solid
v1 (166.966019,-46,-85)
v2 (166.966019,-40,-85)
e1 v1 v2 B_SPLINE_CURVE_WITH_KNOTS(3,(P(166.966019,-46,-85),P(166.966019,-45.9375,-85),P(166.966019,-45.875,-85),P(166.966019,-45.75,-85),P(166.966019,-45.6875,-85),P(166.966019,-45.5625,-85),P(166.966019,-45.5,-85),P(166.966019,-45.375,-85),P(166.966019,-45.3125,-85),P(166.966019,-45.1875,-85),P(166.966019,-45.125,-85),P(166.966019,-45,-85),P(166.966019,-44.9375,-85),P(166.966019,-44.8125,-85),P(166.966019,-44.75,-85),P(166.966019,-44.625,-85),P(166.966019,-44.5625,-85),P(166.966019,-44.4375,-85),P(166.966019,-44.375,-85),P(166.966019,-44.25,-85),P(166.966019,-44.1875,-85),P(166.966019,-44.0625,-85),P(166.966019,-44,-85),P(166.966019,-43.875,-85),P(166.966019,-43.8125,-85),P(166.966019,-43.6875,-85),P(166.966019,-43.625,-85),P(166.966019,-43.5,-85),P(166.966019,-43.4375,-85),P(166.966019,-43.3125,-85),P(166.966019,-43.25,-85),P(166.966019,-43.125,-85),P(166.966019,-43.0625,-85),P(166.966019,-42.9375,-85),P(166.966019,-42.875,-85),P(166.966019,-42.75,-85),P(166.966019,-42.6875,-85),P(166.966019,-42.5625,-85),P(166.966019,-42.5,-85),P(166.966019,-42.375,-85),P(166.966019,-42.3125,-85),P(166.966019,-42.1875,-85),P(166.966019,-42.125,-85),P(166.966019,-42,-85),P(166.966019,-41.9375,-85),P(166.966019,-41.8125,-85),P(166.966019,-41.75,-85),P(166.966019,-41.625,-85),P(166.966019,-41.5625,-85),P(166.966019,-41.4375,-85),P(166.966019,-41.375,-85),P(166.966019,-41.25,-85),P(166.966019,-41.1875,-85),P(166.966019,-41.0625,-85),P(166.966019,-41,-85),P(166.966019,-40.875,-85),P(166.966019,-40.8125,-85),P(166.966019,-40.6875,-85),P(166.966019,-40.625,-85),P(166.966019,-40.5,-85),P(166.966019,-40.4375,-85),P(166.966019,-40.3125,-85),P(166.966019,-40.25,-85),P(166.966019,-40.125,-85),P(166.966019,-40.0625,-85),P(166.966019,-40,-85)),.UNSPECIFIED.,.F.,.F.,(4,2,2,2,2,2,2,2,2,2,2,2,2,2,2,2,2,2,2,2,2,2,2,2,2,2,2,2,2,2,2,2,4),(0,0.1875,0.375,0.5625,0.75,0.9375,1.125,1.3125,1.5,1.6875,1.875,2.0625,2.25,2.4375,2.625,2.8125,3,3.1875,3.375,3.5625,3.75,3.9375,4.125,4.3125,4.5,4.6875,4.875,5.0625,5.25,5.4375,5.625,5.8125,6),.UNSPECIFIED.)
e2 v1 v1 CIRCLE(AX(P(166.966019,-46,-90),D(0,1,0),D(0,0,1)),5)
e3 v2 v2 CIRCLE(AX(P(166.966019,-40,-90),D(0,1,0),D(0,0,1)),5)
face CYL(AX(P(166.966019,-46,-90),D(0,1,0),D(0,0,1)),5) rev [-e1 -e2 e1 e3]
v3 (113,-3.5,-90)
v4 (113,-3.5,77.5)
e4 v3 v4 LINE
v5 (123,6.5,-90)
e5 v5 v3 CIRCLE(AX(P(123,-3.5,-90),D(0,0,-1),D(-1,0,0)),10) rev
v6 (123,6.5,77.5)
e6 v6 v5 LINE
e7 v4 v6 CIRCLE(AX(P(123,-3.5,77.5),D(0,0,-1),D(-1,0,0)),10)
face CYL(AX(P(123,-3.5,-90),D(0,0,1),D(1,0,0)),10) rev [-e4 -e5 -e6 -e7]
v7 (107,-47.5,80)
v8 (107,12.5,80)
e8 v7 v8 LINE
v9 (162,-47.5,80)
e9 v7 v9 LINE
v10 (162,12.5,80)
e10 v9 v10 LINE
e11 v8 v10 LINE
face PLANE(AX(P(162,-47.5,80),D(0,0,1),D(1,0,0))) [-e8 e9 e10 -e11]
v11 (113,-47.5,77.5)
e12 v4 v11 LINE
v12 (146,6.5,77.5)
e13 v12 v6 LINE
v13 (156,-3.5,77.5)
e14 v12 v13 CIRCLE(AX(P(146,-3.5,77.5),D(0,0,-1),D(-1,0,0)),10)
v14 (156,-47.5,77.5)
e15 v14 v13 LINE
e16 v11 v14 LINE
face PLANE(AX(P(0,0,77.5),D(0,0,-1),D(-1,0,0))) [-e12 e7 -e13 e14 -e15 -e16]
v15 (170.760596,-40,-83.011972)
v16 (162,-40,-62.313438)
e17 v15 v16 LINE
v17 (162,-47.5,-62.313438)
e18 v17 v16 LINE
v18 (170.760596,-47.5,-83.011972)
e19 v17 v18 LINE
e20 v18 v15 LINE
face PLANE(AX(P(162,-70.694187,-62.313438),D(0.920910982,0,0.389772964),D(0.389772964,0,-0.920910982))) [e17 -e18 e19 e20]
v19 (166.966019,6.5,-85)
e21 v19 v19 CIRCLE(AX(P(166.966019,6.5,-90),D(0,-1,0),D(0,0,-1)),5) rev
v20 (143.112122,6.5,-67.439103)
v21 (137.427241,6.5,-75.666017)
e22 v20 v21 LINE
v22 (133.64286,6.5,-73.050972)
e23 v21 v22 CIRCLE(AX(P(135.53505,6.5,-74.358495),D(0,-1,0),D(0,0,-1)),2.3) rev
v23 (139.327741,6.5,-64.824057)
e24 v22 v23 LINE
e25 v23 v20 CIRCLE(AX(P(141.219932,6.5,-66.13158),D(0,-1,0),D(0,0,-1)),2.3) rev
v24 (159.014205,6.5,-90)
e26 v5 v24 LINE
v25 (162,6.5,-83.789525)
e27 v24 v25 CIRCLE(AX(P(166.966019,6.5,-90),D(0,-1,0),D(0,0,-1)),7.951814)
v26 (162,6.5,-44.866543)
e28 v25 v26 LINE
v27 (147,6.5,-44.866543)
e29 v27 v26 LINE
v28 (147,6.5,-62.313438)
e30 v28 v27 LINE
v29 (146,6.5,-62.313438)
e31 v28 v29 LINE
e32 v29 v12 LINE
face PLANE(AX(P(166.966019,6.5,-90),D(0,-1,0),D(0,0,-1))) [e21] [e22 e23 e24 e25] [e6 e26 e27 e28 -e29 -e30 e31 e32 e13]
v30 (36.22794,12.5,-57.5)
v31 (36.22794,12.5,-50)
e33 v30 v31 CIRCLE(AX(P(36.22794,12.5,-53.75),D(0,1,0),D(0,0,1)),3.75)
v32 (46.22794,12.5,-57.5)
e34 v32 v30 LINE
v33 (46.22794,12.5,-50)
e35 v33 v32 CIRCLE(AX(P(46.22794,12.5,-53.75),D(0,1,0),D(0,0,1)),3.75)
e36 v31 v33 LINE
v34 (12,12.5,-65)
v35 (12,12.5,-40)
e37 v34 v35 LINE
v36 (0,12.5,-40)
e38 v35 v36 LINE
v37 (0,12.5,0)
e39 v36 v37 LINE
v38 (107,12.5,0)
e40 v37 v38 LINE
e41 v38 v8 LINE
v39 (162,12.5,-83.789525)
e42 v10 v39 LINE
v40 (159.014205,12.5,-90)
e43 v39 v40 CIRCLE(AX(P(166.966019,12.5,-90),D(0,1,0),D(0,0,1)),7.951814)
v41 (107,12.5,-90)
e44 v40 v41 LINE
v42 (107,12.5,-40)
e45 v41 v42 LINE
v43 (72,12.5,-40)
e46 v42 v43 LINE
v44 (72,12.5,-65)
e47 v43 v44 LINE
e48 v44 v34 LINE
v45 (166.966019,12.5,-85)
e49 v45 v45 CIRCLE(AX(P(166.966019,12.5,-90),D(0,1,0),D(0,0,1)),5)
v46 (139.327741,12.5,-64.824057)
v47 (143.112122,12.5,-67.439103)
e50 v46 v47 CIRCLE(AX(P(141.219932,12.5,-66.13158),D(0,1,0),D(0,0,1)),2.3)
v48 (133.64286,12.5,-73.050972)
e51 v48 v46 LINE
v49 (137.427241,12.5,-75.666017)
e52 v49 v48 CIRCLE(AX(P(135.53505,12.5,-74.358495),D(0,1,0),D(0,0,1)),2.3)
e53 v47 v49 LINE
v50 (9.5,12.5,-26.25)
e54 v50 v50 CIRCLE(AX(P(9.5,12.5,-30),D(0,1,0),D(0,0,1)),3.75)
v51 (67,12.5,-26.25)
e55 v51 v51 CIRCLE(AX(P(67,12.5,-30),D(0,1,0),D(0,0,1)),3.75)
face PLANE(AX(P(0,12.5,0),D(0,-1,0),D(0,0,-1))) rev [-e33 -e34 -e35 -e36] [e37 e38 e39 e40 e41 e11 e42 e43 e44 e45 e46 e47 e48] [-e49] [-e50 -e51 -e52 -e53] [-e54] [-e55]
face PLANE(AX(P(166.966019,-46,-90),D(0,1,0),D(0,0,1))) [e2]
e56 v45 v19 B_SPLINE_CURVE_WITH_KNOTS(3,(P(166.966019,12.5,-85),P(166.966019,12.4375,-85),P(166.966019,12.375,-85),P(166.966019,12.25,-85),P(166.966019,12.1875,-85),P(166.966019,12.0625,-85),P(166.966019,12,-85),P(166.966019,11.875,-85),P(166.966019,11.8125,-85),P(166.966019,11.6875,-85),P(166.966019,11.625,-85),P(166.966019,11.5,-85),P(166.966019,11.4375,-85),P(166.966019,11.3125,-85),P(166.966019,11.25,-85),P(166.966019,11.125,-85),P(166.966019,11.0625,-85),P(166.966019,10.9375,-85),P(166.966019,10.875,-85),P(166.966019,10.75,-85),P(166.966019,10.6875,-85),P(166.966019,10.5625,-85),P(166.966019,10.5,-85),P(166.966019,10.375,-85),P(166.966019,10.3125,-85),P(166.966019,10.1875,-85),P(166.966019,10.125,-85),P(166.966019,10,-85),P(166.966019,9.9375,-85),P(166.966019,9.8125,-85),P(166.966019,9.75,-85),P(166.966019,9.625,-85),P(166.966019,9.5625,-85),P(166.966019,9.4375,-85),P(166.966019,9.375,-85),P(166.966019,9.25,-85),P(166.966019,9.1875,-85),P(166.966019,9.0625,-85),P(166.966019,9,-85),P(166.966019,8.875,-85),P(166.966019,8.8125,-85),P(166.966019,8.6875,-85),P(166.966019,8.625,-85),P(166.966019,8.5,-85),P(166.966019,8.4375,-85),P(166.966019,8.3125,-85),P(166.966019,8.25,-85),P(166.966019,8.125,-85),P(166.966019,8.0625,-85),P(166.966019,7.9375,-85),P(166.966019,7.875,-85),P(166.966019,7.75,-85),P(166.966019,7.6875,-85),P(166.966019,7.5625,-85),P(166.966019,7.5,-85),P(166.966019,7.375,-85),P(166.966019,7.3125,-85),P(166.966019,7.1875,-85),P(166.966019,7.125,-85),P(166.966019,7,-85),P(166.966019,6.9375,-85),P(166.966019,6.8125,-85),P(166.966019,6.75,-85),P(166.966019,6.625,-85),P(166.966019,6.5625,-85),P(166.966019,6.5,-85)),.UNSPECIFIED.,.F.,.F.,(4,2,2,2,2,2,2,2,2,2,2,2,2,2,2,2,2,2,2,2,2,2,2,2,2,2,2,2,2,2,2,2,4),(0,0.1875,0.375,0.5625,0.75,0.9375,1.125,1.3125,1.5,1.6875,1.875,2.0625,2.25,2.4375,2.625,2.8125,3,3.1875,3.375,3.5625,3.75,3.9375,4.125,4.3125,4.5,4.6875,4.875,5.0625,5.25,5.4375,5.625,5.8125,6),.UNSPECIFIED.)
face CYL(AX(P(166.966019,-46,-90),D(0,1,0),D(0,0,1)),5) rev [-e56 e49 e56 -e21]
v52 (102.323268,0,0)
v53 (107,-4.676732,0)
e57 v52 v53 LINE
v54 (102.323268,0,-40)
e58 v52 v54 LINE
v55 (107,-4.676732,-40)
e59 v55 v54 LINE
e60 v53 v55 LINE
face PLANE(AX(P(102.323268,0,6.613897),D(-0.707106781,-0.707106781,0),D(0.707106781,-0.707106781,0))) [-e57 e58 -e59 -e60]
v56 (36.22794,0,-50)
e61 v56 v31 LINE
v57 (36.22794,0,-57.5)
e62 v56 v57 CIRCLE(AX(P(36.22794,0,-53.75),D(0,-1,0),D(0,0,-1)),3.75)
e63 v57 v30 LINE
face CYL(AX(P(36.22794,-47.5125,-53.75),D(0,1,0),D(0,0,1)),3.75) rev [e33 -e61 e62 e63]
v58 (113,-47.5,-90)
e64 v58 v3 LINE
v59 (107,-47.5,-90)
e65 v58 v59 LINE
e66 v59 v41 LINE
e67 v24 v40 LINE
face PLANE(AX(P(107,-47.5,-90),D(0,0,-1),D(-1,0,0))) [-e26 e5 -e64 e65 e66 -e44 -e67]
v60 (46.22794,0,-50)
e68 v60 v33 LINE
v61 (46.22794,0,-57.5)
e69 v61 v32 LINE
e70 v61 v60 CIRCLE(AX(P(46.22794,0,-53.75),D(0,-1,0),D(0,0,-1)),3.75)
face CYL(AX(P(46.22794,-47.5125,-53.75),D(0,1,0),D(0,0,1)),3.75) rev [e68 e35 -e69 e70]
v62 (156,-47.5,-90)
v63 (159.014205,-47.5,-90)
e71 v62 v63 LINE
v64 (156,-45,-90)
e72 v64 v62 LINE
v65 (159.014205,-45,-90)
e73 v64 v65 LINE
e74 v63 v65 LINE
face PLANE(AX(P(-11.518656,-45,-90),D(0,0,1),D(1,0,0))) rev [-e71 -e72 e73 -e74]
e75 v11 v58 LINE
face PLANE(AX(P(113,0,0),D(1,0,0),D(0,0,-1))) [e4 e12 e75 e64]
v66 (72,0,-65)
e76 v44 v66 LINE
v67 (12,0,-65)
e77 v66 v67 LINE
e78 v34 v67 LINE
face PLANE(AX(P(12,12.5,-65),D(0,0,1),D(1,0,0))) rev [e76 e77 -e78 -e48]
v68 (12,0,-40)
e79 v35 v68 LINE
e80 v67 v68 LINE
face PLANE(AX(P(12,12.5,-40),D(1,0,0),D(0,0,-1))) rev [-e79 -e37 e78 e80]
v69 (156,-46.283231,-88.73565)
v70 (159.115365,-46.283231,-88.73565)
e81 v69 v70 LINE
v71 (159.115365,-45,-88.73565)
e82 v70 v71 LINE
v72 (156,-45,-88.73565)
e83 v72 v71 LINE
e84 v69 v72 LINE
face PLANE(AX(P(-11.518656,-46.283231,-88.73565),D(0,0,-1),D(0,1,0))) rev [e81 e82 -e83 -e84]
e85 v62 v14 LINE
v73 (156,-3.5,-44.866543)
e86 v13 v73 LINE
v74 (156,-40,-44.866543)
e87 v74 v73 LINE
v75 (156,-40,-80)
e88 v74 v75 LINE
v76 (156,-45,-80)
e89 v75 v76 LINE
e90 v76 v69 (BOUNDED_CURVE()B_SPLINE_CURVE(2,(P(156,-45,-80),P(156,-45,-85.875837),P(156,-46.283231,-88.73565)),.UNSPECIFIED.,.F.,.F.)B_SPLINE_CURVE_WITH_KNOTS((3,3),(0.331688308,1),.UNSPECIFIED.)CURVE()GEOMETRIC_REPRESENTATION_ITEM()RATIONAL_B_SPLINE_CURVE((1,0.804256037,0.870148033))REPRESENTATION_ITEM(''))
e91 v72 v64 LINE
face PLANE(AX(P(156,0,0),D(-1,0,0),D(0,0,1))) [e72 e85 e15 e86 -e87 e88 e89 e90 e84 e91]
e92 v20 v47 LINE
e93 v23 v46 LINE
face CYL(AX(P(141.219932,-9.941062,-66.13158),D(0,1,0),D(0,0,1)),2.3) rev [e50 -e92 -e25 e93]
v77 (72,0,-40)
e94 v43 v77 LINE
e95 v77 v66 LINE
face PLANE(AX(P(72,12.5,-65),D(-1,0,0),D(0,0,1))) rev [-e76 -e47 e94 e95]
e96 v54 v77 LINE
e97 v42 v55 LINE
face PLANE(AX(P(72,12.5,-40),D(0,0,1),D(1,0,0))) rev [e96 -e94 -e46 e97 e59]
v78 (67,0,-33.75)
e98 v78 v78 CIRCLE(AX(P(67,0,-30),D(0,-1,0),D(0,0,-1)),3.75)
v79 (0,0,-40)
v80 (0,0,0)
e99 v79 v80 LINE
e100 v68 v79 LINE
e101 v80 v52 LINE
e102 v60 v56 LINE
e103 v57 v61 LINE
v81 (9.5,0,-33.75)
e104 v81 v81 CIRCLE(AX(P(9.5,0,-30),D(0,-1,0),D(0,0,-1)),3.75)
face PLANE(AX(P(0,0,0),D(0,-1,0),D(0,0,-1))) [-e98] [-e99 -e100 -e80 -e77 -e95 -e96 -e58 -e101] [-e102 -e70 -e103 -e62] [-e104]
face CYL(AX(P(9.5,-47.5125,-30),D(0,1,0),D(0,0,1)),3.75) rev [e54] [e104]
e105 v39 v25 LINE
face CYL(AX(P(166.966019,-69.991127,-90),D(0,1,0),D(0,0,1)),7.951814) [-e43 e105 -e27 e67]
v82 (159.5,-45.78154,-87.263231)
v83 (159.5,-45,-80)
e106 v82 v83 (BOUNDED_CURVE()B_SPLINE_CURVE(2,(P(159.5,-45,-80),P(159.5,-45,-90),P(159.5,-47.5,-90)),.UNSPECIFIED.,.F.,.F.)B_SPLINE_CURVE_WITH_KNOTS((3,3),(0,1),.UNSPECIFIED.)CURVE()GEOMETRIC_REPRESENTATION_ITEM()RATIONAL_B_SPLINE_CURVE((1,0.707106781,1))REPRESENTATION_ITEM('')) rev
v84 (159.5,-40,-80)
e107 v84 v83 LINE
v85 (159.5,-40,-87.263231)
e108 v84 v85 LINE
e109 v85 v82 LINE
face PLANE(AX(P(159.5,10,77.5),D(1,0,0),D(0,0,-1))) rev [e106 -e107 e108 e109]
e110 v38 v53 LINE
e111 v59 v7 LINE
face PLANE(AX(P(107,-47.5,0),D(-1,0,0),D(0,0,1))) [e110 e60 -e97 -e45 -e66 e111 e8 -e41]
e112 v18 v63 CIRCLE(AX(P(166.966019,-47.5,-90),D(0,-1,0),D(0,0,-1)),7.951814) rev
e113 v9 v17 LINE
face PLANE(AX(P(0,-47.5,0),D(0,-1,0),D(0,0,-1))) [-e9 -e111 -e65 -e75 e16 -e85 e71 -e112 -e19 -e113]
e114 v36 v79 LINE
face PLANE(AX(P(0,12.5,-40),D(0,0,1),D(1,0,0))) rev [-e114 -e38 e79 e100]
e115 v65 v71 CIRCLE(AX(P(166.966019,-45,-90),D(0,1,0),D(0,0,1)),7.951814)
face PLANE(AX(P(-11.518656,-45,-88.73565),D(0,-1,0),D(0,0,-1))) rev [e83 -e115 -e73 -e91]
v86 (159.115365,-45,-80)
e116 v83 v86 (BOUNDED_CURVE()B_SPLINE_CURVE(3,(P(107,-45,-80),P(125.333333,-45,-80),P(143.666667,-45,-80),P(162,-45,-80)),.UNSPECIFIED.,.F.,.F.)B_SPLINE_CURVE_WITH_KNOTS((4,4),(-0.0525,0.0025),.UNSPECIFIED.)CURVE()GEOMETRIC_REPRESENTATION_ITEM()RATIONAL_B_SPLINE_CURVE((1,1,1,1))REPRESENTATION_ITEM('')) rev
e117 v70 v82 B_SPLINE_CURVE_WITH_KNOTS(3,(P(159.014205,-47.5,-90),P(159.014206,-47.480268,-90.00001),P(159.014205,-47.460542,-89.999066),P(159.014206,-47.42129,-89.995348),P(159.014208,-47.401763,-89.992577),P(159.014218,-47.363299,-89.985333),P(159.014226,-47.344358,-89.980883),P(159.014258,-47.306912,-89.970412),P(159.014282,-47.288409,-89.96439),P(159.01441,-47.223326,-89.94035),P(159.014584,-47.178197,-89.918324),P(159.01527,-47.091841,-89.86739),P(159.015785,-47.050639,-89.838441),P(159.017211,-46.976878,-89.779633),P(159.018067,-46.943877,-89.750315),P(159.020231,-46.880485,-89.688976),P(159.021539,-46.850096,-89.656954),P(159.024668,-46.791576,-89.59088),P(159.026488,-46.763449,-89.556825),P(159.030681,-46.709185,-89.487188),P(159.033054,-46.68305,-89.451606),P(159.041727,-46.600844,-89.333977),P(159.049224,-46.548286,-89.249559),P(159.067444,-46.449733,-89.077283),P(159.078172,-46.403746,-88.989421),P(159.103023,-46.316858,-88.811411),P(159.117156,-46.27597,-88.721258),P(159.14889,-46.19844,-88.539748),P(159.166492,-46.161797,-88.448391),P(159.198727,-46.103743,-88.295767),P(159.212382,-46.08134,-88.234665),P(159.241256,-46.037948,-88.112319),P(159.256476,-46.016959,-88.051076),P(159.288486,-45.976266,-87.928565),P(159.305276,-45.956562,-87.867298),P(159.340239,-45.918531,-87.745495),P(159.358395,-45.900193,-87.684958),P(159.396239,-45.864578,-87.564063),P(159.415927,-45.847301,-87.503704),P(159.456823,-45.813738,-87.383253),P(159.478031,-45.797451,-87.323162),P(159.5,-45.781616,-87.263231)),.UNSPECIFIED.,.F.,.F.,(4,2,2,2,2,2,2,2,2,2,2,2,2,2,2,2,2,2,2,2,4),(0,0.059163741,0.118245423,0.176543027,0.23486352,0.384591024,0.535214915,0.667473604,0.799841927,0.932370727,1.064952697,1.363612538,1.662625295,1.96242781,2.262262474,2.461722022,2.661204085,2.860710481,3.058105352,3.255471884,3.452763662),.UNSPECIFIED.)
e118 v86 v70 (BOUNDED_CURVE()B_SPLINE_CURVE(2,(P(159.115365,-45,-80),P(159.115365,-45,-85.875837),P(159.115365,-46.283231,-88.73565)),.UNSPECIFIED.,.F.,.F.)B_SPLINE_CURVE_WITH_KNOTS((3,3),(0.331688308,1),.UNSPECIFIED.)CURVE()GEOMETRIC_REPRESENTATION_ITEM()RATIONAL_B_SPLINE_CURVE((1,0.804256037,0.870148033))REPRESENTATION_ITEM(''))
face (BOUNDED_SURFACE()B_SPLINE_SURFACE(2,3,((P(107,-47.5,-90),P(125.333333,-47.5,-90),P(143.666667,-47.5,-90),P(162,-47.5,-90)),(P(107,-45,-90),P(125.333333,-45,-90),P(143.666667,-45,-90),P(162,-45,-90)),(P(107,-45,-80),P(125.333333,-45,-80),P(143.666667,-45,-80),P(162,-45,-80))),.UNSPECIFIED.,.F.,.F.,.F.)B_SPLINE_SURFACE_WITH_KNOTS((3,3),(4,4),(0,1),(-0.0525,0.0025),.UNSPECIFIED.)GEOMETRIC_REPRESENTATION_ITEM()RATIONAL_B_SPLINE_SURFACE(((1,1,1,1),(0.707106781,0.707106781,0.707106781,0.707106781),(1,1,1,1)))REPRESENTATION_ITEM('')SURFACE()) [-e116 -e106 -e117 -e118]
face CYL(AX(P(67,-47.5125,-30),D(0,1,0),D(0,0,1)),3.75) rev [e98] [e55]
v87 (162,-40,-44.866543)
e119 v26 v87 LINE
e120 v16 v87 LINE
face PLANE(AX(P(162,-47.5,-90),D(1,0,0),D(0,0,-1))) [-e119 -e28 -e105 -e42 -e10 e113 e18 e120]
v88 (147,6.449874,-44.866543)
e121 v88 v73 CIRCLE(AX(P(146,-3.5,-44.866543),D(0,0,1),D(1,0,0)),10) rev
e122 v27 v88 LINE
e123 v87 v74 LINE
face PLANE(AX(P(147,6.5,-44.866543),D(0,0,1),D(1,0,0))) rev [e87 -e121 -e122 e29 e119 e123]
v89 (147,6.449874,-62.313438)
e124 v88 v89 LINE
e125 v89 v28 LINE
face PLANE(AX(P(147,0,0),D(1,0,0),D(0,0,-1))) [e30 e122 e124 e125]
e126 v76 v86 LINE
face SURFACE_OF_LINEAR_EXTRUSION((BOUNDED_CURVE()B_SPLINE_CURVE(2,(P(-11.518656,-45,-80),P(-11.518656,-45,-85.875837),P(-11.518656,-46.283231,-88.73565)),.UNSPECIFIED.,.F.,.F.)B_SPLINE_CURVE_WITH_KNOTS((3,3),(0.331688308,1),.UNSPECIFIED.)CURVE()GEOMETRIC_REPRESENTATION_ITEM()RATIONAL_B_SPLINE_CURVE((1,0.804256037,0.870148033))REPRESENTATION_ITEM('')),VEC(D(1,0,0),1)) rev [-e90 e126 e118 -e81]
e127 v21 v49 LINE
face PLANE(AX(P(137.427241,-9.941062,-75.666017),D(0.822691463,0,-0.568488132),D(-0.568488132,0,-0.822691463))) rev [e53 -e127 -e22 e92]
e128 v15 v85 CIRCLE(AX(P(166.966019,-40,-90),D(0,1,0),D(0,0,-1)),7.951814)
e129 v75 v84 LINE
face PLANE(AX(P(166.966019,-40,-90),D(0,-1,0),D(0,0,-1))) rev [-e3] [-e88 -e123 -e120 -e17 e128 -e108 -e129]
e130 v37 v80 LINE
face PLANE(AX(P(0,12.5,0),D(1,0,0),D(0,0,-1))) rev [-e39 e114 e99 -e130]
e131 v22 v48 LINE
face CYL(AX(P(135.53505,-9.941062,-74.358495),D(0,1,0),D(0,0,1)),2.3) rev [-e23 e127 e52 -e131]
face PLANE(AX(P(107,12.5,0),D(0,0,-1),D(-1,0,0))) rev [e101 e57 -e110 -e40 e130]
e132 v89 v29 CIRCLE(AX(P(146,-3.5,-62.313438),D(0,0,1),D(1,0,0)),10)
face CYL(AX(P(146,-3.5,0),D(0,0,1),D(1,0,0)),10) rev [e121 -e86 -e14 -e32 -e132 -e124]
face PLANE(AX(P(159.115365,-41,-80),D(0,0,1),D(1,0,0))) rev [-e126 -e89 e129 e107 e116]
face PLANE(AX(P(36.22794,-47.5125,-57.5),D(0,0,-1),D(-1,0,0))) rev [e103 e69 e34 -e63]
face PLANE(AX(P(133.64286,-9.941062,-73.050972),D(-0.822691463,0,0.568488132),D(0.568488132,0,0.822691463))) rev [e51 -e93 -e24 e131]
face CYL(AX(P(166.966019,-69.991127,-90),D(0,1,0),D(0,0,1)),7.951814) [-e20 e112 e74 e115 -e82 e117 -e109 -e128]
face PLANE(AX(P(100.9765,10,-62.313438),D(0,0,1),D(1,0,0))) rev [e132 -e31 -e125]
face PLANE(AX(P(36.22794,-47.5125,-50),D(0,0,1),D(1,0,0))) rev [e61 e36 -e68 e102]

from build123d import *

# Parameters (mm, degrees)
BOSS_EXTRUDE1_DEPTH  = 12.5
BOSS_EXTRUDE2_DEPTH  = 60
SKETCH3_W            = 50
SKETCH3_H            = 55
CUT_EXTRUDE1_DEPTH   = 167.5
FILLET1_SIZE         = 2.5
FILLET1_SIZE_2       = 10
BOSS_EXTRUDE3_REACH  = 196.792
SKETCH6_R            = 7.951814216
CUT_EXTRUDE2_DEPTH   = 55
SKETCH9_W            = 5.049792513
SKETCH9_H            = 55
CUT_EXTRUDE3_DEPTH   = 2.5
SKETCH10_R           = 5
CUT_EXTRUDE4_DEPTH   = 58.5
SKETCH11_W           = 20
SKETCH11_H           = 55
CUT_EXTRUDE6_DEPTH   = 2.5
SKETCH12_W           = 49.615365164
SKETCH12_H           = 4.469133196
CUT_EXTRUDE7_DEPTH   = 167.5
BOSS_EXTRUDE4_START  = 5
SKETCH13_R           = 5
BOSS_EXTRUDE4_DEPTH  = 5
BOSS_EXTRUDE5_DEPTH  = 2.5
SKETCH17_W           = 167.5
SKETCH17_H           = 57.5
BOSS_EXTRUDE6_DEPTH  = 3.5
BOSS_EXTRUDE7_DEPTH  = 3.5
SKETCH20_W           = 139.813438208
SKETCH20_H           = 51.5
BOSS_EXTRUDE8_DEPTH  = 3.5
BOSS_EXTRUDE9_DEPTH  = 3.115365164
BOSS_EXTRUDE10_START = 4
BOSS_EXTRUDE10_DEPTH = 4
SKETCH24_R           = 3.75
CUT_EXTRUDE8_DEPTH   = 210.262529948
CUT_EXTRUDE9_DEPTH   = 210.262529948
SKETCH26_R           = 5
CUT_EXTRUDE10_DEPTH  = 3.5
BOSS_EXTRUDE11_DEPTH = 40
FILLET2_R            = 10
CUT_EXTRUDE11_DEPTH  = 6
SKETCH30_W           = 17.446895317
SKETCH30_H           = 47.5
CUT_EXTRUDE12_DEPTH  = 15
BOSS_EXTRUDE12_START = 1
BOSS_EXTRUDE12_DEPTH = 1


with BuildPart() as part:
    # Sketch1 → Boss-Extrude1 (new body)
    with BuildSketch(Plane(origin=(0, 0, 0), x_dir=(1, 0, 0), z_dir=(0, 1, 0))):
        Polygon((0, 0), (0, 40), (12, 40), (12, 65), (72, 65), (72, 40), (107, 40), (107, 0), align=None)
    extrude(amount=BOSS_EXTRUDE1_DEPTH)

    # Sketch2 → Boss-Extrude2 (add)
    with BuildSketch(Plane(origin=(0, 12.5, 0), x_dir=(1, 0, 0), z_dir=(0, 1, 0))):
        Polygon((107, 0), (107, 40), (107, 90), (162, 90), (162, -80), (107, -80), align=None)
    extrude(amount=-BOSS_EXTRUDE2_DEPTH)

    # Sketch3 → Cut-Extrude1 (cut)
    with BuildSketch(Plane(origin=(0, 0, -90), x_dir=(-1, 0, 0), z_dir=(0, 0, -1))):
        with Locations((-134.5, -17.5)):
            Rectangle(SKETCH3_W, SKETCH3_H)
    extrude(amount=-CUT_EXTRUDE1_DEPTH, mode=Mode.SUBTRACT)

    # Fillet1
    # an asymmetric fillet: 10, 2.5 mm, written as the material it takes off along each edge
    with BuildSketch(Plane(origin=(159.5, -45, -90), x_dir=(0, -1, 0), z_dir=(-1, 0, 0))) as fillet1_piece_1:
        with BuildLine():
            Bezier((FILLET1_SIZE, 0), (0, 0), (0, FILLET1_SIZE_2), weights=[1, 0.707106781, 1])
            Line((0, FILLET1_SIZE_2), (0, 0))
            Line((0, 0), (FILLET1_SIZE, 0))
        make_face()
    extrude(amount=50, mode=Mode.SUBTRACT)

    # Boss-Extrude3: up to this face of the body (flat: up to its plane)
    boss_extrude3_end = Plane(part.part.faces().sort_by_distance((134.5, -47.5, -5))[0])
    # Sketch6 → Boss-Extrude3 (add, up to the picked face)
    with BuildSketch(Plane(origin=(0, 12.5, 0), x_dir=(1, 0, 0), z_dir=(0, 1, 0)), mode=Mode.PRIVATE) as boss_extrude3_sk1:
        with Locations((166.966019237, 90)):
            Circle(SKETCH6_R)
    boss_extrude3_tool1 = split(extrude(boss_extrude3_sk1.sketch, amount=-BOSS_EXTRUDE3_REACH, mode=Mode.PRIVATE), bisect_by=boss_extrude3_end, keep=Keep.BOTH, mode=Mode.PRIVATE)
    add(boss_extrude3_tool1.solids().sort_by(Axis((166.966019, 12.5, -90), (0, -1, 0)))[0])

    # Sketch7 → Cut-Extrude2 (cut)
    with BuildSketch(Plane(origin=(0, 10, 0), x_dir=(1, 0, 0), z_dir=(0, 1, 0))):
        with BuildLine():
            ThreePointArc((162, 83.789524795), (174.132615768, 93.445467092), (159.01420502, 90))
            ThreePointArc((159.01420502, 90), (159.799422705, 86.554532908), (162, 83.789524795))
        make_face()
    extrude(amount=-CUT_EXTRUDE2_DEPTH, mode=Mode.SUBTRACT)

    # Sketch9 → Cut-Extrude3 (cut)
    with BuildSketch(Plane(origin=(162, 0, 0), x_dir=(0, 0, -1), z_dir=(1, 0, 0))):
        with Locations((84.738334464, -17.5)):
            Rectangle(SKETCH9_W, SKETCH9_H)
    extrude(amount=-CUT_EXTRUDE3_DEPTH, mode=Mode.SUBTRACT)

    # Sketch10 → Cut-Extrude4 (cut)
    with BuildSketch(Plane(origin=(0, 12.5, 0), x_dir=(1, 0, 0), z_dir=(0, 1, 0))):
        with Locations(Location((166.966019237, 90, 0), (0, 0, 270))):
            Circle(SKETCH10_R)
    extrude(amount=-CUT_EXTRUDE4_DEPTH, mode=Mode.SUBTRACT)

    # Sketch11 → Cut-Extrude6 (cut)
    with BuildSketch(Plane(origin=(162, 0, 0), x_dir=(0, 0, -1), z_dir=(1, 0, 0))):
        with Locations((72.313438208, -17.5)):
            Rectangle(SKETCH11_W, SKETCH11_H)
    extrude(amount=-CUT_EXTRUDE6_DEPTH, mode=Mode.SUBTRACT)

    # Sketch12 → Cut-Extrude7 (cut)
    with BuildSketch(Plane(origin=(0, 0, -90), x_dir=(-1, 0, 0), z_dir=(0, 0, -1))):
        with Locations((-134.307682582, -47.234566598)):
            Rectangle(SKETCH12_W, SKETCH12_H)
    extrude(amount=-CUT_EXTRUDE7_DEPTH, mode=Mode.SUBTRACT)

    # Sketch13 → Boss-Extrude4 (add)
    with BuildSketch(Plane(origin=(0, -45, 0), x_dir=(1, 0, 0), z_dir=(0, 1, 0)).offset(BOSS_EXTRUDE4_START)):
        with BuildLine():
            ThreePointArc((162, 83.789524795), (174.132615768, 93.445467092), (159.01420502, 90))
            ThreePointArc((159.01420502, 90), (159.799422705, 86.554532908), (162, 83.789524795))
        make_face()
        with Locations(Location((166.966019237, 90, 0), (0, 0, 270))):
            Circle(SKETCH13_R, mode=Mode.SUBTRACT)
    extrude(amount=-BOSS_EXTRUDE4_DEPTH)

    # Sketch15 → Boss-Extrude5 (add)
    with BuildSketch(Plane(origin=(0, -45, 0), x_dir=(1, 0, 0), z_dir=(0, 1, 0))):
        with BuildLine():
            Line((162, 62.313438208), (162, 83.789524795))
            ThreePointArc((162, 83.789524795), (166.263013728, 82.079322467), (170.760595676, 83.011971739))
            Line((170.760595676, 83.011971739), (162, 62.313438208))
        make_face()
    extrude(amount=-BOSS_EXTRUDE5_DEPTH)

    # Sketch17 → Boss-Extrude6 (add)
    with BuildSketch(Plane(origin=(109.5, 0, 0), x_dir=(0, 0, -1), z_dir=(1, 0, 0))):
        with Locations((6.25, -18.75)):
            Rectangle(SKETCH17_W, SKETCH17_H)
    extrude(amount=BOSS_EXTRUDE6_DEPTH)

    # Sketch19 → Boss-Extrude7 (add)
    with BuildSketch(Plane.XZ.offset(-10)):
        with BuildLine():
            Line((159.5, 77.5), (113, 77.5))
            Line((113, 77.5), (113, -90))
            Line((113, -90), (159.01420502, -90))
            ThreePointArc((159.01420502, -90), (174.132615768, -93.445467092), (162, -83.789524795))
            Line((162, -83.789524795), (162, -62.313438208))
            Line((162, -62.313438208), (159.5, -62.313438208))
            Line((159.5, -62.313438208), (159.5, 77.5))
        make_face()
    extrude(amount=BOSS_EXTRUDE7_DEPTH)

    # Sketch20 → Boss-Extrude8 (add)
    with BuildSketch(Plane.ZY.offset(-159.5)):
        with Locations((7.593280896, -19.25)):
            Rectangle(SKETCH20_W, SKETCH20_H)
    extrude(amount=BOSS_EXTRUDE8_DEPTH)

    # Sketch21 → Boss-Extrude9 (add)
    with BuildSketch(Plane.ZY.offset(-159.115365164)):
        with BuildLine():
            Line((-90, -47.5), (77.5, -47.5))
            Line((77.5, -47.5), (77.5, -45))
            Line((77.5, -45), (-62.313438208, -45))
            Line((-62.313438208, -45), (-80, -45))
            add(Edge.make_bspline(
                [(-80, -45), (-85.875836894, -45), (-88.73565038, -46.28323142)],
                knots=[0.331688308, 0.331688308, 0.331688308, 1, 1, 1], degree=2, weights=[1, 0.804256037, 0.870148033]))
            Line((-88.73565038, -46.28323142), (-88.73565038, -45))
            Line((-88.73565038, -45), (-90, -45))
            Line((-90, -45), (-90, -47.5))
        make_face()
    extrude(amount=BOSS_EXTRUDE9_DEPTH)

    # Sketch22 → Boss-Extrude10 (add)
    with BuildSketch(Plane(origin=(0, -45, 0), x_dir=(1, 0, 0), z_dir=(0, 1, 0)).offset(BOSS_EXTRUDE10_START)):
        with BuildLine():
            Line((159.5, 80), (159.115365164, 80))
            Line((159.115365164, 80), (156, 80))
            Line((156, 80), (156, 62.313438208))
            Line((156, 62.313438208), (162, 62.313438208))
            Line((162, 62.313438208), (170.760595676, 83.011971739))
            ThreePointArc((170.760595676, 83.011971739), (164.157429949, 82.560700601), (159.5, 87.263230721))
            Line((159.5, 87.263230721), (159.5, 80))
        make_face()
    extrude(amount=-BOSS_EXTRUDE10_DEPTH)

    # Sketch24 → Cut-Extrude8 (cut, through all)
    with BuildSketch(Plane(origin=(0, 12.5, 0), x_dir=(1, 0, 0), z_dir=(0, 1, 0))):
        with Locations(Location((67, 30, 0), (0, 0, 270))):
            Circle(SKETCH24_R)
        with Locations(Location((9.5, 30, 0), (0, 0, 270))):
            Circle(SKETCH24_R)
    extrude(amount=-CUT_EXTRUDE8_DEPTH, mode=Mode.SUBTRACT)

    # Sketch25 → Cut-Extrude9 (cut, through all)
    with BuildSketch(Plane(origin=(0, 12.5, 0), x_dir=(1, 0, 0), z_dir=(0, 1, 0))):
        with BuildLine():
            Line((36.227939868, 57.5), (46.227939868, 57.5))
            ThreePointArc((46.227939868, 57.5), (49.977939868, 53.75), (46.227939868, 50))
            Line((46.227939868, 50), (36.227939868, 50))
            ThreePointArc((36.227939868, 50), (32.477939868, 53.75), (36.227939868, 57.5))
        make_face()
    extrude(amount=-CUT_EXTRUDE9_DEPTH, mode=Mode.SUBTRACT)

    # Sketch26 → Cut-Extrude10 (cut)
    with BuildSketch(Plane(origin=(0, 10, 0), x_dir=(1, 0, 0), z_dir=(0, 1, 0))):
        with Locations(Location((166.966019237, 90, 0), (0, 0, 270))):
            Circle(SKETCH26_R)
    extrude(amount=-CUT_EXTRUDE10_DEPTH, mode=Mode.SUBTRACT)

    # Sketch27 → Boss-Extrude11 (add)
    with BuildSketch(Plane(origin=(0, 0, -40), x_dir=(-1, 0, 0), z_dir=(0, 0, -1))):
        Polygon((-102.323268395, 0), (-107, -4.676731605), (-107, 0), align=None)
    extrude(amount=-BOSS_EXTRUDE11_DEPTH)

    # Fillet2
    fillet2_edges = [part.edges().sort_by_distance(p)[0] for p in [
        (113, 6.5, -6.25),
        (156, 6.5, 7.593280896),
    ]]
    fillet(fillet2_edges, radius=FILLET2_R)

    # Sketch28 → Cut-Extrude11 (cut)
    with BuildSketch(Plane(origin=(0, 12.5, 0), x_dir=(1, 0, 0), z_dir=(0, 1, 0))):
        with BuildLine():
            Line((137.427240594, 75.66601743), (143.112121915, 67.439102797))
            ThreePointArc((143.112121915, 67.439102797), (142.527454254, 64.239389728), (139.327741185, 64.82405739))
            Line((139.327741185, 64.82405739), (133.642859864, 73.050972022))
            ThreePointArc((133.642859864, 73.050972022), (134.227527525, 76.250685091), (137.427240594, 75.66601743))
        make_face()
    extrude(amount=-CUT_EXTRUDE11_DEPTH, mode=Mode.SUBTRACT)

    # Sketch30 → Cut-Extrude12 (cut)
    with BuildSketch(Plane(origin=(162, 0, 0), x_dir=(0, 0, -1), z_dir=(1, 0, 0))):
        with Locations((53.58999055, -17.25)):
            Rectangle(SKETCH30_W, SKETCH30_H)
    extrude(amount=-CUT_EXTRUDE12_DEPTH, mode=Mode.SUBTRACT)

    # Sketch31 → Boss-Extrude12 (add)
    with BuildSketch(Plane(origin=(0, -41, 0), x_dir=(1, 0, 0), z_dir=(0, 1, 0)).offset(BOSS_EXTRUDE12_START)):
        with BuildLine():
            Line((159.5, 87.263230721), (159.5, 80))
            Line((159.5, 80), (156, 80))
            Line((156, 80), (156, 44.866542891))
            Line((156, 44.866542891), (162, 44.866542891))
            Line((162, 44.866542891), (162, 62.313438208))
            Line((162, 62.313438208), (170.760595676, 83.011971739))
            ThreePointArc((170.760595676, 83.011971739), (164.157429949, 82.560700601), (159.5, 87.263230721))
        make_face()
    extrude(amount=-BOSS_EXTRUDE12_DEPTH)


solid = part.part
